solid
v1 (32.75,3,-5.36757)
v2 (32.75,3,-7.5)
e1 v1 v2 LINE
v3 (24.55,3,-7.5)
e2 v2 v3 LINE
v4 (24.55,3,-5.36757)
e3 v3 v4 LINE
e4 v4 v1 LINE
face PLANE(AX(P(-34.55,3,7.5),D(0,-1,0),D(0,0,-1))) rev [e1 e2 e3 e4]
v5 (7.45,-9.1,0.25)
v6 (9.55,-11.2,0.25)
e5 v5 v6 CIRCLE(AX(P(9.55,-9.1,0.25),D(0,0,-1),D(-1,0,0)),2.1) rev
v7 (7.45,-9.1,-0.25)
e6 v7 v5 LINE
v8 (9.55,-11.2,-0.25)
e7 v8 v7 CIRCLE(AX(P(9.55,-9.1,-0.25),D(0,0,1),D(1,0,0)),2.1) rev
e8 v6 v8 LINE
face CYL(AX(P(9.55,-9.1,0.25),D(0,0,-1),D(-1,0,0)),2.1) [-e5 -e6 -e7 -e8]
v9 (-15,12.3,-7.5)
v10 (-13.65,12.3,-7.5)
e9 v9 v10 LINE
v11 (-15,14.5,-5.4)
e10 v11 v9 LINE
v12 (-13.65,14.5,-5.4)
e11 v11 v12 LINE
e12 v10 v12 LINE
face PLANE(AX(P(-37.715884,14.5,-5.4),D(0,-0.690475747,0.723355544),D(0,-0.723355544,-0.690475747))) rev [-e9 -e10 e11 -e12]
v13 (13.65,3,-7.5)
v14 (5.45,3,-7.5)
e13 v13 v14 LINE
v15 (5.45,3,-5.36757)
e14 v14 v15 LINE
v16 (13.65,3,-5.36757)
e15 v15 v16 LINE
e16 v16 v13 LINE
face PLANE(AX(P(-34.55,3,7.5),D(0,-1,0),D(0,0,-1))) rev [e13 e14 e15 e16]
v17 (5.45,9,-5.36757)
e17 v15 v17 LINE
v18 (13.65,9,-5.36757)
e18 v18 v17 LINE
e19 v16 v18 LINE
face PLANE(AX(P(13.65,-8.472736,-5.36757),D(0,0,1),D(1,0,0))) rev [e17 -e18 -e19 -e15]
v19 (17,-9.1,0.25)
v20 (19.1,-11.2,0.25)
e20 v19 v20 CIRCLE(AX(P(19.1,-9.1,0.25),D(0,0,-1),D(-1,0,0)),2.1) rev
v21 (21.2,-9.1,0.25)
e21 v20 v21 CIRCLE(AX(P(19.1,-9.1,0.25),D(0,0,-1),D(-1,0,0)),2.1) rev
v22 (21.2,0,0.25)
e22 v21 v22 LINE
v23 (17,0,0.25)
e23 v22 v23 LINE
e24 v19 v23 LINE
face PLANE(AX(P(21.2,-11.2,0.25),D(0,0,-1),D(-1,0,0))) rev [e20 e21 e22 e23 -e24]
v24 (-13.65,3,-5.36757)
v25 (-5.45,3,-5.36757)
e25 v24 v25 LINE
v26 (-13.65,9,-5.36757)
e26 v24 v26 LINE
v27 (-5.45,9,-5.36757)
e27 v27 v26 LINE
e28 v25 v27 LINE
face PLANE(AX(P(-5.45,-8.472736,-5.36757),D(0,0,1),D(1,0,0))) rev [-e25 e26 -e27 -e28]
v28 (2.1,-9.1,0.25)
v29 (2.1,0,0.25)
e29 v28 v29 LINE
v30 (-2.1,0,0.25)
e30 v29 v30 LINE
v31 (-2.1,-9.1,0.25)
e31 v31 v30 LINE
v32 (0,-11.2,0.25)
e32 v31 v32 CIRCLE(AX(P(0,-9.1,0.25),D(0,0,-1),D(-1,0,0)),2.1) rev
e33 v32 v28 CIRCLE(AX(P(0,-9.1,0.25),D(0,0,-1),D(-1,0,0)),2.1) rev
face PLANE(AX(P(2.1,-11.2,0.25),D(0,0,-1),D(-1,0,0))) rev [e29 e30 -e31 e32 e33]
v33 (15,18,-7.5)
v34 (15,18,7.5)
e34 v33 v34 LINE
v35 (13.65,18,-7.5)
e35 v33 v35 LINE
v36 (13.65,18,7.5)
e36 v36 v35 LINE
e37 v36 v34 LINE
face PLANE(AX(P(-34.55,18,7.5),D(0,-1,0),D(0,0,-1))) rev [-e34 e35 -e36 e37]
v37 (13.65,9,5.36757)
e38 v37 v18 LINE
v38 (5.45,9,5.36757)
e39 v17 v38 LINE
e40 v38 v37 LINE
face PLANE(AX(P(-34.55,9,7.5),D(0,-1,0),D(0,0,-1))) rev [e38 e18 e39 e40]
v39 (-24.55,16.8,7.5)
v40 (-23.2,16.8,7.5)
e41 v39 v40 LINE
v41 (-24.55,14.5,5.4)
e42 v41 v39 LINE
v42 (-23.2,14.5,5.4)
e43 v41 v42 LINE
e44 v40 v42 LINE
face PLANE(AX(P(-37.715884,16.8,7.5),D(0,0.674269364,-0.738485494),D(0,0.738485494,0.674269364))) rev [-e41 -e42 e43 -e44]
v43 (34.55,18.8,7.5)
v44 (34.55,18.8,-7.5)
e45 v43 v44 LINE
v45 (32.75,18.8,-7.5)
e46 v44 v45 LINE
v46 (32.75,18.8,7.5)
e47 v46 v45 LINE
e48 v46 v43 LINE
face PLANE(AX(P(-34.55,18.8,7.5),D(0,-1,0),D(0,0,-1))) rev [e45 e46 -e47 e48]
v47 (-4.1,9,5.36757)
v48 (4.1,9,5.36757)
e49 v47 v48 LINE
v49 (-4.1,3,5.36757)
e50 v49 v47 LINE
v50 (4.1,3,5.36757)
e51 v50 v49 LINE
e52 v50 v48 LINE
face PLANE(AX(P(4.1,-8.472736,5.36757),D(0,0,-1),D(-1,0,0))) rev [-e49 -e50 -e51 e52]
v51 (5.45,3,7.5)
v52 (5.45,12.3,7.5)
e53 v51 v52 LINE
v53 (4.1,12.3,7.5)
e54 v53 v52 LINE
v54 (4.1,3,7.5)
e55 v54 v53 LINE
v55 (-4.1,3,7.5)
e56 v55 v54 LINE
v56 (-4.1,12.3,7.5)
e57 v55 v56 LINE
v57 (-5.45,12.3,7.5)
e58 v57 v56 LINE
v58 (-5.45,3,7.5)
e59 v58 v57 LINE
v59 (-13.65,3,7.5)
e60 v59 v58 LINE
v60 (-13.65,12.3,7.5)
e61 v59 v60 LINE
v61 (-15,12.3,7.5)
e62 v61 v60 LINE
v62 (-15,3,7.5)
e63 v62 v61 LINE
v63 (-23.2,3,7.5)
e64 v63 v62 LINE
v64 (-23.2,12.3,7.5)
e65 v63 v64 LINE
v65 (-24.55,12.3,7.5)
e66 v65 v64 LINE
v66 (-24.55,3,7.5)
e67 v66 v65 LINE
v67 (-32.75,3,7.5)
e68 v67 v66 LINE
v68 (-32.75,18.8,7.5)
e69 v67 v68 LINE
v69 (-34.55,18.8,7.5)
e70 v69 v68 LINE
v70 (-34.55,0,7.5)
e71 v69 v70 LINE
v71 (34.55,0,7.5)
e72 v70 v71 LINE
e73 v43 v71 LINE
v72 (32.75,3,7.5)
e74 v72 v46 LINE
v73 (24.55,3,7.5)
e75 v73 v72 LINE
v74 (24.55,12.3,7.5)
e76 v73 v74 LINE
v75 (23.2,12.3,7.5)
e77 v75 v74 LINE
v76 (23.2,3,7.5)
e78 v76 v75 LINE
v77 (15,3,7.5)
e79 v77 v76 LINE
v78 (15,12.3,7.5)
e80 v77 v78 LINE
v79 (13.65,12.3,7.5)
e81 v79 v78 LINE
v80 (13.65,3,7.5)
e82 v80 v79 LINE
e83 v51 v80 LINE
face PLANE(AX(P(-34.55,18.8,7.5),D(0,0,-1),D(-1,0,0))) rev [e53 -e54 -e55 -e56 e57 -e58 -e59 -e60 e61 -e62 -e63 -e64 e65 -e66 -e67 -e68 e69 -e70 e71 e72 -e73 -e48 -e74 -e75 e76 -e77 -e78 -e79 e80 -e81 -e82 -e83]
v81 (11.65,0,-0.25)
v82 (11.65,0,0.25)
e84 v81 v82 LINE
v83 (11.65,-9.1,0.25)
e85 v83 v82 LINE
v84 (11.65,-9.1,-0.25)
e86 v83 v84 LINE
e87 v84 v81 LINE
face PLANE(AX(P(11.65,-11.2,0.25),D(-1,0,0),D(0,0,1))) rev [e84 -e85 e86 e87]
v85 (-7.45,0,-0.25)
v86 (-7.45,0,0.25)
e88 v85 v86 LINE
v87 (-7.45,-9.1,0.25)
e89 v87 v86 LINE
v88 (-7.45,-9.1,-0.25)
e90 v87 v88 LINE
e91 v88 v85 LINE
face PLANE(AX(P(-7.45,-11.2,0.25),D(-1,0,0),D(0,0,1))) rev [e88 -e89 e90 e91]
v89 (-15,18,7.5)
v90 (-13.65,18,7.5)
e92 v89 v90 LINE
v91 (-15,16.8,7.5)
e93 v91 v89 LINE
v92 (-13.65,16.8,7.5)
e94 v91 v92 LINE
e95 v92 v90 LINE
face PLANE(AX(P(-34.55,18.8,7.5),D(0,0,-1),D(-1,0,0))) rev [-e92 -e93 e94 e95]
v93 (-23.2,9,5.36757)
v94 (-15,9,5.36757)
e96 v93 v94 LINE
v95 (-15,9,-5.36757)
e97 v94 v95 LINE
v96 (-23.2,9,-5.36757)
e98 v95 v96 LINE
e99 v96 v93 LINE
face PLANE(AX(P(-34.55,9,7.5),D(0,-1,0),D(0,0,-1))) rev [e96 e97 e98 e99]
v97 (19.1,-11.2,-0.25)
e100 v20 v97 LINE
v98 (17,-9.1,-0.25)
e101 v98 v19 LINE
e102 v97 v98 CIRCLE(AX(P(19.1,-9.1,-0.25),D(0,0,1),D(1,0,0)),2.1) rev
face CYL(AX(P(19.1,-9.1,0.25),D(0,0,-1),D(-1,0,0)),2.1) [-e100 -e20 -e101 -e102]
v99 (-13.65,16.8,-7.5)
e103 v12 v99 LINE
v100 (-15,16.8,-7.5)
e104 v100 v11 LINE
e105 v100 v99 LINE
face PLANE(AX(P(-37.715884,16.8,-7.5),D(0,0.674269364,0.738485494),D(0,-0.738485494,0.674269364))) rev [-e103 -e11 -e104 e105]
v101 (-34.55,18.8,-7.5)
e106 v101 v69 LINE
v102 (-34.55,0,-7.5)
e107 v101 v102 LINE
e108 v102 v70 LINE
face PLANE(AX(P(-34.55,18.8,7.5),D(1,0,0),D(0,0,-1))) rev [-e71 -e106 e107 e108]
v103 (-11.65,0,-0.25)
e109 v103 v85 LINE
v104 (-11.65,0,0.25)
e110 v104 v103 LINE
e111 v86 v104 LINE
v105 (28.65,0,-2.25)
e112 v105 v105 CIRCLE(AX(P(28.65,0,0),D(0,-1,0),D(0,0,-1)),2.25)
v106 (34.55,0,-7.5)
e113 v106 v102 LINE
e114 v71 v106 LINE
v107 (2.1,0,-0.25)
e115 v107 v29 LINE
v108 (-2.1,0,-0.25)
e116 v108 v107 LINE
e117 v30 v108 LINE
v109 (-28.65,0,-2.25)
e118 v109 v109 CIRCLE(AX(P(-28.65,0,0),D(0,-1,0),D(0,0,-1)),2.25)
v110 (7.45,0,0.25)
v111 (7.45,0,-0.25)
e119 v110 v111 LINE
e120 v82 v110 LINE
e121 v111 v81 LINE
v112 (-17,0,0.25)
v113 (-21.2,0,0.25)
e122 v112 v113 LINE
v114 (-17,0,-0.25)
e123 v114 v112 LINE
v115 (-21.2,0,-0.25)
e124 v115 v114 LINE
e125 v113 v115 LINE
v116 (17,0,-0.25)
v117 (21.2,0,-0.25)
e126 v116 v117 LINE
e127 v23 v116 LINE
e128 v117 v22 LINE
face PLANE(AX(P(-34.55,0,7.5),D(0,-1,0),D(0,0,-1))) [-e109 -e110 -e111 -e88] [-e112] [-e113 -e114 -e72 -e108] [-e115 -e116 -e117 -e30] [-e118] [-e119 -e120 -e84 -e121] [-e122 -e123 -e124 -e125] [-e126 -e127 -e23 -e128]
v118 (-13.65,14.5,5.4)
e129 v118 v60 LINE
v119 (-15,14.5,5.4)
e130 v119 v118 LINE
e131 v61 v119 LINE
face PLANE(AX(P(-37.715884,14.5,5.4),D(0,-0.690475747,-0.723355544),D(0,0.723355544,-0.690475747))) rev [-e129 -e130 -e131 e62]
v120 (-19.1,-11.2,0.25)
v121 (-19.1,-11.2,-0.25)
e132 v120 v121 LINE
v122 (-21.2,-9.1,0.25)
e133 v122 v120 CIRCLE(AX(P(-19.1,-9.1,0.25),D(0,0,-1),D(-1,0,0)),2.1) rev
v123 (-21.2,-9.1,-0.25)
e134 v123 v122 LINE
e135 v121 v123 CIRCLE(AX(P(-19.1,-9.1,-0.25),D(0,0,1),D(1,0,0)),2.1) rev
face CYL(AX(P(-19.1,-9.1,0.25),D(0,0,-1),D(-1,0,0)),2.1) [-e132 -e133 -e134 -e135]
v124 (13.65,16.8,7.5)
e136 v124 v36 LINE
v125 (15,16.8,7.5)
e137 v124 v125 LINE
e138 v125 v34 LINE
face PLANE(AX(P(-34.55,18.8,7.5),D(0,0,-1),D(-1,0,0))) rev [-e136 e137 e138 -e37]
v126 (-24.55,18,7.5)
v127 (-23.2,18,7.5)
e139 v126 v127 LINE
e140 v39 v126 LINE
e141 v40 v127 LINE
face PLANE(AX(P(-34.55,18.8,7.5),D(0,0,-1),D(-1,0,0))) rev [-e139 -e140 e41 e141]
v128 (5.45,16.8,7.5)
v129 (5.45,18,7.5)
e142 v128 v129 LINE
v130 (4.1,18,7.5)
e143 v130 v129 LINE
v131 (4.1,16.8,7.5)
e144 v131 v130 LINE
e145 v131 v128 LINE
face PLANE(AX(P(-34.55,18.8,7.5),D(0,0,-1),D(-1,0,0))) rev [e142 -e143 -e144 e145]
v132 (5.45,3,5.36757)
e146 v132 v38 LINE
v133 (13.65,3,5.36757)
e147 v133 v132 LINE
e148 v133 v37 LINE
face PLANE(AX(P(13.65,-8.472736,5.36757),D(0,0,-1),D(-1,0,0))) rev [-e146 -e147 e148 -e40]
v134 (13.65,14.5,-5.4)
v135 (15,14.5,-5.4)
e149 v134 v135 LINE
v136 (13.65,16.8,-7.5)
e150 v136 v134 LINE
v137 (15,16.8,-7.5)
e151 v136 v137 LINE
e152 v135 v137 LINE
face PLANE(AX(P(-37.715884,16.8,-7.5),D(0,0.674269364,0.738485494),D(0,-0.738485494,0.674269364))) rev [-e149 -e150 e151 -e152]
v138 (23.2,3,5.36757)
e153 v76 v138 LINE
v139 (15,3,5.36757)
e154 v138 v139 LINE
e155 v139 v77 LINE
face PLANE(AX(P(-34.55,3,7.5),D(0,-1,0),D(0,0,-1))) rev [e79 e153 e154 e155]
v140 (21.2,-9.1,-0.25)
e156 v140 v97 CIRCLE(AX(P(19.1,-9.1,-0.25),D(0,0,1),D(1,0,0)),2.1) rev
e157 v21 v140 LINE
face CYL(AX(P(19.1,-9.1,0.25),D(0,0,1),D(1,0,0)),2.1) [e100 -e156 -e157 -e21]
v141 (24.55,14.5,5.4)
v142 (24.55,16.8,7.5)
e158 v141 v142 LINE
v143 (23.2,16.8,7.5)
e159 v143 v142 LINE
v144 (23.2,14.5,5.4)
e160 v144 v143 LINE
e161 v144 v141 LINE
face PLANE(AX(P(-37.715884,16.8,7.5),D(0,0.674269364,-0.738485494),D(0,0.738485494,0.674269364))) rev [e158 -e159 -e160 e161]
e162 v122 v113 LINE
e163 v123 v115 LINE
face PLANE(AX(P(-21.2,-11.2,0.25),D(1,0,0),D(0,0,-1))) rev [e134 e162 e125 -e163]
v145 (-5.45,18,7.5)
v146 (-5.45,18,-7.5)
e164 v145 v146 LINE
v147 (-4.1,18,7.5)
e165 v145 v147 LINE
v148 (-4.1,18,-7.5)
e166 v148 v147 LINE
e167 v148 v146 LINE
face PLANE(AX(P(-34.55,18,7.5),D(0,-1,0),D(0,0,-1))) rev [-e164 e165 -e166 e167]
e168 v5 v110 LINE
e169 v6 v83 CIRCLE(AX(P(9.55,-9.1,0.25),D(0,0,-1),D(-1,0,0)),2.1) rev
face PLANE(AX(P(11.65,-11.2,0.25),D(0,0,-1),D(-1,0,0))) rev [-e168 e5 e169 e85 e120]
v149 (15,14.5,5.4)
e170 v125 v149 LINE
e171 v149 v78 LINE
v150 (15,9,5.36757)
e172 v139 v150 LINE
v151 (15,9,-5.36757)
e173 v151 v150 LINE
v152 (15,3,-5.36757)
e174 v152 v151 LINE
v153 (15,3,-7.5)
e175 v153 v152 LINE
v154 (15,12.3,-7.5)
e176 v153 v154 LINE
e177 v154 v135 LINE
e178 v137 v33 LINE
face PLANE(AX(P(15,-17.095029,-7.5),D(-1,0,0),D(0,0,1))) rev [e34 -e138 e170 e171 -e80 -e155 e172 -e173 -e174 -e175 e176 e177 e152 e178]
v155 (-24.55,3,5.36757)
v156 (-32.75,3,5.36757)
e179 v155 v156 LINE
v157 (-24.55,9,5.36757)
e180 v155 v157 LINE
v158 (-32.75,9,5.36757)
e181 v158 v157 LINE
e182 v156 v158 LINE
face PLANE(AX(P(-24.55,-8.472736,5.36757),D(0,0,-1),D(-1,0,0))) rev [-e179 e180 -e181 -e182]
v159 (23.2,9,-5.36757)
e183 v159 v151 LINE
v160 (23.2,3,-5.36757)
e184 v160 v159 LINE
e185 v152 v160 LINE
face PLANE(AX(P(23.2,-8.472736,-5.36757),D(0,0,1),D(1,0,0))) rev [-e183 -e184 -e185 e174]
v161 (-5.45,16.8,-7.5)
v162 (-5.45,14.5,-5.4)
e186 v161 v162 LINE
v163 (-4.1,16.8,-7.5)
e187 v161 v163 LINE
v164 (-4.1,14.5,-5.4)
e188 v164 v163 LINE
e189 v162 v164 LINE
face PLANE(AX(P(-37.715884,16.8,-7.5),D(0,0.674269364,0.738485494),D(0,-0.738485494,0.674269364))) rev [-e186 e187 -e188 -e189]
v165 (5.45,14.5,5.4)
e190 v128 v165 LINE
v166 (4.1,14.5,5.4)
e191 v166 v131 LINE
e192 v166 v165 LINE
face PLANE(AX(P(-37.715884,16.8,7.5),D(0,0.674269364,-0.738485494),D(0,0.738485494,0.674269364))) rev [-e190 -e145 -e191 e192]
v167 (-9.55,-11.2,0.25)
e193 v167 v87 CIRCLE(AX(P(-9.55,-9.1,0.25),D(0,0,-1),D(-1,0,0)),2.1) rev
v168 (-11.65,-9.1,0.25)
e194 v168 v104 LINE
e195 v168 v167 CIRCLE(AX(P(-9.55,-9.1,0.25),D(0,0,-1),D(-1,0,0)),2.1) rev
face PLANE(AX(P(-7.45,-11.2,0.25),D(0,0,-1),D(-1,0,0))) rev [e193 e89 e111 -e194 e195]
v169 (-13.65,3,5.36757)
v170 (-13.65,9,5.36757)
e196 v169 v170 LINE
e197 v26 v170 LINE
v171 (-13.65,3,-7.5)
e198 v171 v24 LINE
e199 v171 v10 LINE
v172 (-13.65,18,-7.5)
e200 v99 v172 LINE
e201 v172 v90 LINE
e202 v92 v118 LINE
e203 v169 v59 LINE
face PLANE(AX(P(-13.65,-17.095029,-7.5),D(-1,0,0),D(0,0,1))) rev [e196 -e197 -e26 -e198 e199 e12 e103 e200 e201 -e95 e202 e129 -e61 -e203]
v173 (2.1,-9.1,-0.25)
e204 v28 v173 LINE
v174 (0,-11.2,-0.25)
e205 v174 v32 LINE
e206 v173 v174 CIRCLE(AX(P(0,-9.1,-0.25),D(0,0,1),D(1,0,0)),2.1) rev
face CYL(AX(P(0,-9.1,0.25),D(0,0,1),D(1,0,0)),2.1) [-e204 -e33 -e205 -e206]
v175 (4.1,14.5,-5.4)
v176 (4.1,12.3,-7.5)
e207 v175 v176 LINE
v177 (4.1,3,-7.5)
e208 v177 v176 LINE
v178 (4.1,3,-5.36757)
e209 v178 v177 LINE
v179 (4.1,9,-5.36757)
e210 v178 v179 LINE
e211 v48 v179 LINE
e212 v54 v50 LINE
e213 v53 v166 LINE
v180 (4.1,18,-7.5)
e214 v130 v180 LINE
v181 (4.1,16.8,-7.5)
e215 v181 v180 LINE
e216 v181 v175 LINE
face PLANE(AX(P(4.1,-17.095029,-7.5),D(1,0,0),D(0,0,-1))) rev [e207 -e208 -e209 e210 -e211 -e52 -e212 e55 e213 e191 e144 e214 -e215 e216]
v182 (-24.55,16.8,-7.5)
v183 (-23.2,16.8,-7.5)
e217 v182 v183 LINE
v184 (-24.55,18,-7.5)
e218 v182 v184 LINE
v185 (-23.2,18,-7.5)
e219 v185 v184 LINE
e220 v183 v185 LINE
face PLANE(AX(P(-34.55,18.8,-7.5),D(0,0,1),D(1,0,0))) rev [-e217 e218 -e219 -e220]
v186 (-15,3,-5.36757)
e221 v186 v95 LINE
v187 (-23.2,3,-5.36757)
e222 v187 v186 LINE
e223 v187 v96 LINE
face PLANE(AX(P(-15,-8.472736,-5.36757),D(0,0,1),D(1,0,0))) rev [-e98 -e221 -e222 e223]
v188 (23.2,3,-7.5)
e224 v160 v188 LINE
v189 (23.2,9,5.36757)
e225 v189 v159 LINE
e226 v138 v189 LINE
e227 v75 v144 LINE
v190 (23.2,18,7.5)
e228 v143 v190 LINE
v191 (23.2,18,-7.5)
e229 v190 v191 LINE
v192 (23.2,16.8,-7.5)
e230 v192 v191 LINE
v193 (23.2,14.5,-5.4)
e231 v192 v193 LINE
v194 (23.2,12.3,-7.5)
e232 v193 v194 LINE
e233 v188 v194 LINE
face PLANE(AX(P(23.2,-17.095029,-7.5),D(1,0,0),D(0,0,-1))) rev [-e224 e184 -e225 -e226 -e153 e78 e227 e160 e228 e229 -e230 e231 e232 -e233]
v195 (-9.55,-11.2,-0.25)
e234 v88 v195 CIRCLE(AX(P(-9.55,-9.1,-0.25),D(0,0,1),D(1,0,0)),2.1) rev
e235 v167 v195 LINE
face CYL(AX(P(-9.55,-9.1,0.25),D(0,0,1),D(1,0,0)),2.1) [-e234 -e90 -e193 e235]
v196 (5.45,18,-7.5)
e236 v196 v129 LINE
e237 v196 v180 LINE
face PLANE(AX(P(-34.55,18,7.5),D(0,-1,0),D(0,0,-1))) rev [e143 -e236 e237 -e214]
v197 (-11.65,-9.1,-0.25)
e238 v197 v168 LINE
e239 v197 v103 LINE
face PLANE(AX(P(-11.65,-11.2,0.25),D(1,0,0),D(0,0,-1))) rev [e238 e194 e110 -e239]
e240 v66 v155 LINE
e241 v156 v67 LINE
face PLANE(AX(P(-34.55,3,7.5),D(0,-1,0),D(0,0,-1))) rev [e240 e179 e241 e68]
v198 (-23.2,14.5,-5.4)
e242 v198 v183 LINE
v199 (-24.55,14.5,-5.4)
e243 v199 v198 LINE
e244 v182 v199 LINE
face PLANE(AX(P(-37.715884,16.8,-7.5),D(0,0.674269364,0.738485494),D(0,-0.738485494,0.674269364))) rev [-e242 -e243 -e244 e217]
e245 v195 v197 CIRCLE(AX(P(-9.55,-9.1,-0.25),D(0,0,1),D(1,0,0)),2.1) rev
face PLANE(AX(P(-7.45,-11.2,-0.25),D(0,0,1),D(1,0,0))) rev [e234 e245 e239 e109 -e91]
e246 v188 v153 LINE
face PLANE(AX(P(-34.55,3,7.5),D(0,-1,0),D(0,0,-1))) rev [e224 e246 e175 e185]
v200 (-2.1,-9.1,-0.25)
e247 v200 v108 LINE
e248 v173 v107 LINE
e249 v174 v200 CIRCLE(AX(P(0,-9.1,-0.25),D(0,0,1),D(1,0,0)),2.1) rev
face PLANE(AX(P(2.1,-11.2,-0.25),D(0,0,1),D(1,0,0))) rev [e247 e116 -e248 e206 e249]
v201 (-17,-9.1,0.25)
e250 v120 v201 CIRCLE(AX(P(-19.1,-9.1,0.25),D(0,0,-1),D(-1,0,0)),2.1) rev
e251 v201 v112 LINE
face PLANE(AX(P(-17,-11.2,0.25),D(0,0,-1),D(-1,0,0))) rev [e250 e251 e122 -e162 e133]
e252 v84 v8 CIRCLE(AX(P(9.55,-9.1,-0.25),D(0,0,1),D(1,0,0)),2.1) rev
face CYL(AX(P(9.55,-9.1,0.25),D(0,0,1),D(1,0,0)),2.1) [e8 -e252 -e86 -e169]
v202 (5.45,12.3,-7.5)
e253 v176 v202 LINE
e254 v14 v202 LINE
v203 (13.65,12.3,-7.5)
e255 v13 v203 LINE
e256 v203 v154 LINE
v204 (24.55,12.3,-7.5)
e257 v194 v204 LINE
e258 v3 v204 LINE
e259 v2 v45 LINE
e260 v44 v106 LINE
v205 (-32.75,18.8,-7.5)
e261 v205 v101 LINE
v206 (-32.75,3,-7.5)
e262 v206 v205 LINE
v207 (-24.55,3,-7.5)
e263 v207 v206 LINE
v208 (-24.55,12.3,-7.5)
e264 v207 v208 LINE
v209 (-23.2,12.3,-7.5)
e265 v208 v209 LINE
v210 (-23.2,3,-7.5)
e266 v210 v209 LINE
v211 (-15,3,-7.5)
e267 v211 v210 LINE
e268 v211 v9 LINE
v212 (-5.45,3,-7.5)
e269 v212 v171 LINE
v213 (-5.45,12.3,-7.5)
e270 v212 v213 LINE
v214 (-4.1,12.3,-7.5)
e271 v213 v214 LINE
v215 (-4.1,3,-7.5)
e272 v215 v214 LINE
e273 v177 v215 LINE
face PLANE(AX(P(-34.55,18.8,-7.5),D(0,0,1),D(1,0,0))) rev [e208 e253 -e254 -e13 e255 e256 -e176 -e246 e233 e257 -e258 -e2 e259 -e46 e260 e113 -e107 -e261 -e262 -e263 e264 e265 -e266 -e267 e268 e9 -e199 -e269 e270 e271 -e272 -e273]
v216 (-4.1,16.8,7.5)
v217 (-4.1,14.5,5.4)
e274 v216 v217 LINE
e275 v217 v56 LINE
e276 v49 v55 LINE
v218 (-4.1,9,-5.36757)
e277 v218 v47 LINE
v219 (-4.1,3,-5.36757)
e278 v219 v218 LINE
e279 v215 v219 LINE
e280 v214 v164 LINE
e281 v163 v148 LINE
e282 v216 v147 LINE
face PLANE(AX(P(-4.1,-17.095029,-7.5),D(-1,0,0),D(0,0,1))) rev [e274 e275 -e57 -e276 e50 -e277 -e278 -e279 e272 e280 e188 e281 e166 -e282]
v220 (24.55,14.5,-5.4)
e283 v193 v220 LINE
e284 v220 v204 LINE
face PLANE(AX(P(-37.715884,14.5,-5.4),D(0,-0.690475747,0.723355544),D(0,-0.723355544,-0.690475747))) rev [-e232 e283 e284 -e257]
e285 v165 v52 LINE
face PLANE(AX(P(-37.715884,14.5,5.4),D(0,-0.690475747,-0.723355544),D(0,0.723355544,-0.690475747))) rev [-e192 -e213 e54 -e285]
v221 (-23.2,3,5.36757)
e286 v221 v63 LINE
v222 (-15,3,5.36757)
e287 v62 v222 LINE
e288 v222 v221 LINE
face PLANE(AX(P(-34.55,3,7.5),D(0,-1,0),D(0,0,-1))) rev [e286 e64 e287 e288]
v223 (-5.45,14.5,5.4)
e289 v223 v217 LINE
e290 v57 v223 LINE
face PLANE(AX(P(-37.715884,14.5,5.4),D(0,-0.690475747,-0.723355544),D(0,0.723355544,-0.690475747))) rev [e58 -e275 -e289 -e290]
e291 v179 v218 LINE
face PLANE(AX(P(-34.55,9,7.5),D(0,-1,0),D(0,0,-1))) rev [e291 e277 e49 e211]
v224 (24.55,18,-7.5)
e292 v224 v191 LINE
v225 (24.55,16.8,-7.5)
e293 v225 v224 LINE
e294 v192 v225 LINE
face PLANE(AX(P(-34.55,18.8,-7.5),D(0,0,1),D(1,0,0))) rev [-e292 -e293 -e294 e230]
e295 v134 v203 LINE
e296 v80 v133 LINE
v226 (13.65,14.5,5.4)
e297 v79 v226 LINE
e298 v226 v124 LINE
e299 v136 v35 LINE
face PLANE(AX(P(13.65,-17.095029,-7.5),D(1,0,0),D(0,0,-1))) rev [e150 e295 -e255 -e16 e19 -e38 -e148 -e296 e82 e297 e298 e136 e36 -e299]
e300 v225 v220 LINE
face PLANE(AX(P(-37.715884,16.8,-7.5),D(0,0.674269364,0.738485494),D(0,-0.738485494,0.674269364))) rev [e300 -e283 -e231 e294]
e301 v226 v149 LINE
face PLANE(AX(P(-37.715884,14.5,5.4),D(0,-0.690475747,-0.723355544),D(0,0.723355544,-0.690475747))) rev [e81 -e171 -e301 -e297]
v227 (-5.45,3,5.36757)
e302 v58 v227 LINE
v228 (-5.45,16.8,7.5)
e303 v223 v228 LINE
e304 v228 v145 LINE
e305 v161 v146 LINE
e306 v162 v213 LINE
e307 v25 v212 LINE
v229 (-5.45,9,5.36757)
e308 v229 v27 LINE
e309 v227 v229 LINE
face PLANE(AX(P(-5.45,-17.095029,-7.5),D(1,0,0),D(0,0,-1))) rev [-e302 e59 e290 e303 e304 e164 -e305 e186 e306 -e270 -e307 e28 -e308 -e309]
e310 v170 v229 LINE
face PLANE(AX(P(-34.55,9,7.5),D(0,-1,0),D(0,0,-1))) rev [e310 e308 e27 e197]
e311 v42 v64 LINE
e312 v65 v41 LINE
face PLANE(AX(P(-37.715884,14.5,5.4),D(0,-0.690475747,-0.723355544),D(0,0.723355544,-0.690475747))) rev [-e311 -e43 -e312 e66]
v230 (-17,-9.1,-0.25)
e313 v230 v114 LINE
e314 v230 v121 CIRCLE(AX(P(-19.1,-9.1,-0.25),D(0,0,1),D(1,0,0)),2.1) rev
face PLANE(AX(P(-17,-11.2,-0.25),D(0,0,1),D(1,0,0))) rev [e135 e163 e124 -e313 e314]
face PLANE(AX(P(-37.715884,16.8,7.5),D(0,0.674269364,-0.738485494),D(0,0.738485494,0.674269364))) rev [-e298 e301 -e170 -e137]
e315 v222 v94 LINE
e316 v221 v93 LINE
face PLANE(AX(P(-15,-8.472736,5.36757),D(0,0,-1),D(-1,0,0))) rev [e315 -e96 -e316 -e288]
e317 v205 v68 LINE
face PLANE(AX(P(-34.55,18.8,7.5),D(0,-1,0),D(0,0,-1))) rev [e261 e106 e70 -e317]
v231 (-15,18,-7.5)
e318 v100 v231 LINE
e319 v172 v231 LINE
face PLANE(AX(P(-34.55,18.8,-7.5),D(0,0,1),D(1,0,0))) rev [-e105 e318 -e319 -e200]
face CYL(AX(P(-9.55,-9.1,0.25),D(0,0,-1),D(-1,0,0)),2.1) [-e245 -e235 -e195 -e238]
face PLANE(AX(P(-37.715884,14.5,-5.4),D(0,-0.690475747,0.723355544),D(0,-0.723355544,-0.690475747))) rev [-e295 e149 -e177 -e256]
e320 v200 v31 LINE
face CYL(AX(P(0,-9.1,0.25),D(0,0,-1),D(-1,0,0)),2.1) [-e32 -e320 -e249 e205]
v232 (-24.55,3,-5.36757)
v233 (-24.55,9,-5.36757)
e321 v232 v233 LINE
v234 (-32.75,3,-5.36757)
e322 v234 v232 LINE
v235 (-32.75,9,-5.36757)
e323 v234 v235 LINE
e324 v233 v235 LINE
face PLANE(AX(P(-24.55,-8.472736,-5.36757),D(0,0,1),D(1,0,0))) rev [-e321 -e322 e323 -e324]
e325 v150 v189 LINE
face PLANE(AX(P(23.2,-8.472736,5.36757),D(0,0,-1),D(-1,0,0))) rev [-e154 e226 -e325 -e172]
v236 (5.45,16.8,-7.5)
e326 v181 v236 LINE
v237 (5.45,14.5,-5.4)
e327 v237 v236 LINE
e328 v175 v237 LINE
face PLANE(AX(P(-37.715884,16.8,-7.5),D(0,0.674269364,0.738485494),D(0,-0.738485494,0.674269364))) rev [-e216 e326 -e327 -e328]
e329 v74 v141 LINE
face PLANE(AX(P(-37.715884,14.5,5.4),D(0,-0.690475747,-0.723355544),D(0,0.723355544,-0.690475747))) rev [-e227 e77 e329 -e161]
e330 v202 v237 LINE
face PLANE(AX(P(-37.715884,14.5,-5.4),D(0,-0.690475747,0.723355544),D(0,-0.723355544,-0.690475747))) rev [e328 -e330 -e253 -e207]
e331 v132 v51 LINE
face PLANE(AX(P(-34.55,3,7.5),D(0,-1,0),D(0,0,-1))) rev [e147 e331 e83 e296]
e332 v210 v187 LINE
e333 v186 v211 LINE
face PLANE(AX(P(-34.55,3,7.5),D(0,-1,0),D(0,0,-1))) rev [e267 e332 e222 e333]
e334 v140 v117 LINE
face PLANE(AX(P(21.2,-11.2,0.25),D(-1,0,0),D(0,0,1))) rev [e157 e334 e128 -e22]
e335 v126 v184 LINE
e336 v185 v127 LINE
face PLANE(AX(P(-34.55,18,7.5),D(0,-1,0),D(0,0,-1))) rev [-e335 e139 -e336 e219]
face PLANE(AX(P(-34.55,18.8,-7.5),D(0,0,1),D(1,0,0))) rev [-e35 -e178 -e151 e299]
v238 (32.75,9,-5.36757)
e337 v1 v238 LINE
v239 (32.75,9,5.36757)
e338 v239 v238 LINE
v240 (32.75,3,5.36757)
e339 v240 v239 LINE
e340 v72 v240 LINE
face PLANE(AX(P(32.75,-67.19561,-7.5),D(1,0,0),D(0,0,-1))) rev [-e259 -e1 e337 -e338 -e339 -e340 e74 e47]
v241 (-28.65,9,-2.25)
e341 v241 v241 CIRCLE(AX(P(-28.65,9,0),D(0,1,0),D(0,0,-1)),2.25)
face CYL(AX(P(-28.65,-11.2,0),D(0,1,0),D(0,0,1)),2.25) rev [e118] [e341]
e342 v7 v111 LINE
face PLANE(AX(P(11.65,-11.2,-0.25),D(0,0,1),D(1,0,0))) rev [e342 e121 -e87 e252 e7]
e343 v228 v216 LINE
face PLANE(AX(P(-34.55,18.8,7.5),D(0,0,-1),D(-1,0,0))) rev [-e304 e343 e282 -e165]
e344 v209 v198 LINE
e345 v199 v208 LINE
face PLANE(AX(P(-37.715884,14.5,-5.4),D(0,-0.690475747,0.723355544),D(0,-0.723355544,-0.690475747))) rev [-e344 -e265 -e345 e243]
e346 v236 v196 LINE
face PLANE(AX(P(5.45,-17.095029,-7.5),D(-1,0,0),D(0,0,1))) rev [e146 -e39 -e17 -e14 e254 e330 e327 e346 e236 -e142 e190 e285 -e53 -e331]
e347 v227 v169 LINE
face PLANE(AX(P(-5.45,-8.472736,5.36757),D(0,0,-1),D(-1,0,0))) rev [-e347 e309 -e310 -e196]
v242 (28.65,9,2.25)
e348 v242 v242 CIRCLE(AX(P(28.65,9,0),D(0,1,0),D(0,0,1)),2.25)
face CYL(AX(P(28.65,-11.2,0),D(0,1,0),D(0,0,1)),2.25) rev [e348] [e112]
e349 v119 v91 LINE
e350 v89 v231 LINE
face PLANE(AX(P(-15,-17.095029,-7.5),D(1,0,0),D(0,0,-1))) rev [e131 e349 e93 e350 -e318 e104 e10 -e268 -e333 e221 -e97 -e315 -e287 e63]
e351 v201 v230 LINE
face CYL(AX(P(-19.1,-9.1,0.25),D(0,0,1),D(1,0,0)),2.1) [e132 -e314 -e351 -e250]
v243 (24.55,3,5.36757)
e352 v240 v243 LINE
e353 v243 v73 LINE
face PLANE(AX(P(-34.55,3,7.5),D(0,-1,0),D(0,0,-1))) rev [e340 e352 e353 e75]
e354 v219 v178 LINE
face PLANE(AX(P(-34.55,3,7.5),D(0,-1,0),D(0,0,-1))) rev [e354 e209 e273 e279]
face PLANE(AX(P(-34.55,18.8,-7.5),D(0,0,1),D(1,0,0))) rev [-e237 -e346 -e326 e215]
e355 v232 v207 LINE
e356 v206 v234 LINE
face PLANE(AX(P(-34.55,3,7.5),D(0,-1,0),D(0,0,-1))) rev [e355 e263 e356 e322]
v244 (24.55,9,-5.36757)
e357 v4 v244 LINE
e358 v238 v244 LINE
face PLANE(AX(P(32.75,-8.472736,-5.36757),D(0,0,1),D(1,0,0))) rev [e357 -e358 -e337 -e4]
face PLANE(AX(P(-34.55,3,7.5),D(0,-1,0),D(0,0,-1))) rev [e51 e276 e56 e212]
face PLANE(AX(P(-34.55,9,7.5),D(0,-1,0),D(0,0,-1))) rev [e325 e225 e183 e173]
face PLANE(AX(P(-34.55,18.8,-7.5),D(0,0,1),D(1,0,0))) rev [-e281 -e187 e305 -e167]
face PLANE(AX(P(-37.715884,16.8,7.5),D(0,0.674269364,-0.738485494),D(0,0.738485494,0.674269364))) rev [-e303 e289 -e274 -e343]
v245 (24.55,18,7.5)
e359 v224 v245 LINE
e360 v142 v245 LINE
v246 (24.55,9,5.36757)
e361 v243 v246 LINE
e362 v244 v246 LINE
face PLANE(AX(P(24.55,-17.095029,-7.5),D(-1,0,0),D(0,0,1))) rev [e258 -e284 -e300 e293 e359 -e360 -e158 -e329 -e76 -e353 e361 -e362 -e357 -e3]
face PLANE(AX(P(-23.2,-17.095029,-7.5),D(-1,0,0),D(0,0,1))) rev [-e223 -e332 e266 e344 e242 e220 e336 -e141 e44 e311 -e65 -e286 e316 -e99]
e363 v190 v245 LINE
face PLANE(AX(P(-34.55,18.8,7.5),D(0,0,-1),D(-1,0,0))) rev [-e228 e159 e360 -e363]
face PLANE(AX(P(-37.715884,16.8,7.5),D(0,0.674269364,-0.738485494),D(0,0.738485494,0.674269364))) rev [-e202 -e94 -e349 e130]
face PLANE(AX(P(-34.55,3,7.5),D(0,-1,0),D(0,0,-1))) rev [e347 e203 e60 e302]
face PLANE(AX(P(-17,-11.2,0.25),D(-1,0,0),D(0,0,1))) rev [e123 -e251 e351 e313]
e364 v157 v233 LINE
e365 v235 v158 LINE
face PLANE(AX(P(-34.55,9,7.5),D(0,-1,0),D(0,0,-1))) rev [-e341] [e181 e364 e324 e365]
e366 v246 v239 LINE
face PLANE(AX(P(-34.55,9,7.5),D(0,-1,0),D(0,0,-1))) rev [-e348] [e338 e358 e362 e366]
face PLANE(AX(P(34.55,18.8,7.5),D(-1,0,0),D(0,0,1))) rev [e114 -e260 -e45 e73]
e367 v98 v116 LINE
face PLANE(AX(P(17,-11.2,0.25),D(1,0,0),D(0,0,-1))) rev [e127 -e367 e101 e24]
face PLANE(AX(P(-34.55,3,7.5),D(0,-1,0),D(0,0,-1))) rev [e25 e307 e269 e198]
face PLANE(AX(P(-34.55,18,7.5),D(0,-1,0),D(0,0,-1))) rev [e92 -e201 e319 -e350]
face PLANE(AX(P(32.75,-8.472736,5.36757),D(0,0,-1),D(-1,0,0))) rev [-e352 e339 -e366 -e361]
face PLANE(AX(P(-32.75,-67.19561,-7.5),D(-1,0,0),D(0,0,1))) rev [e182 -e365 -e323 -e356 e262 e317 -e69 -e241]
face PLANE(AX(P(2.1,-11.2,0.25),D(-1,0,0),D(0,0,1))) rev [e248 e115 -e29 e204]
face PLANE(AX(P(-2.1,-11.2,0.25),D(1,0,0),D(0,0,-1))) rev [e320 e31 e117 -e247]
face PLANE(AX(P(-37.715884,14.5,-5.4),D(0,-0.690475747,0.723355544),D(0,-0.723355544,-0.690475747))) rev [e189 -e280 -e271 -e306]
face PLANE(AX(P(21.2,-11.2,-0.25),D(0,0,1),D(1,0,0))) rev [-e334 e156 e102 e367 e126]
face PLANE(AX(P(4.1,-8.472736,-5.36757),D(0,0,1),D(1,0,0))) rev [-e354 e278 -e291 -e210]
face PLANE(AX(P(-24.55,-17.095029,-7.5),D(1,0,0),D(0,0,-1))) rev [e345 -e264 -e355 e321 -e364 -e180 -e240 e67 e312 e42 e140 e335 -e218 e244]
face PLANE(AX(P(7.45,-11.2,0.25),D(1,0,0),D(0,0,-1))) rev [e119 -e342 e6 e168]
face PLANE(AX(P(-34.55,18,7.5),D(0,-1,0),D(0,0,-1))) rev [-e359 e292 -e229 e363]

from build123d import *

# Parameters (mm, degrees)
SKETCH_1_W          = 69.1
SKETCH_1_H          = 15
EXTRUDE_1_DEPTH     = 18.8
SKETCH_2_W          = 65.5
SKETCH_2_H          = 15
CUT_EXTRUDE_1_DEPTH = 0.8
SKETCH_4_W          = 8.2
SKETCH_4_H          = 15
CUT_EXTRUDE_2_DEPTH = 9
SKETCH_5_W          = 8.2
SKETCH_5_H          = 2.132429546
CUT_EXTRUDE_3_DEPTH = 15
SKETCH_6_W          = 4.2
SKETCH_6_H          = 0.5
EXTRUDE_2_DEPTH     = 11.2
SKETCH_7_R          = 2.25
CUT_EXTRUDE_4_DEPTH = 41.718454047
CUT_EXTRUDE_START   = -49.1
CUT_EXTRUDE_5_DEPTH = 49.1
FILLET_1_R          = 2.1


with BuildPart() as part:
    # 草图1 → 拉伸1 (new body)
    with BuildSketch(Plane(origin=(0, 0, 0), x_dir=(1, 0, 0), z_dir=(0, 1, 0))):
        Rectangle(SKETCH_1_W, SKETCH_1_H)
    extrude(amount=EXTRUDE_1_DEPTH)

    # 草图2 → 切除-拉伸1 (cut)
    with BuildSketch(Plane(origin=(0, 18.8, 0), x_dir=(-1, 0, 0), z_dir=(0, 1, 0))):
        Rectangle(SKETCH_2_W, SKETCH_2_H)
    extrude(amount=-CUT_EXTRUDE_1_DEPTH, mode=Mode.SUBTRACT)

    # 草图4 → 切除-拉伸2 (cut)
    with BuildSketch(Plane(origin=(0, 18, 0), x_dir=(-1, 0, 0), z_dir=(0, 1, 0))):
        with Locations((-28.65, 0)):
            Rectangle(SKETCH_4_W, SKETCH_4_H)
        with Locations((-19.1, 0)):
            Rectangle(SKETCH_4_W, SKETCH_4_H)
        with Locations((-9.55, 0)):
            Rectangle(SKETCH_4_W, SKETCH_4_H)
        Rectangle(SKETCH_4_W, SKETCH_4_H)
        with Locations((9.55, 0)):
            Rectangle(SKETCH_4_W, SKETCH_4_H)
        with Locations((19.1, 0)):
            Rectangle(SKETCH_4_W, SKETCH_4_H)
        with Locations((28.65, 0)):
            Rectangle(SKETCH_4_W, SKETCH_4_H)
    extrude(amount=-CUT_EXTRUDE_2_DEPTH, mode=Mode.SUBTRACT)

    # 草图5 → 切除-拉伸3 (cut)
    with BuildSketch(Plane(origin=(0, 18, 0), x_dir=(-1, 0, 0), z_dir=(0, 1, 0))):
        with Locations((-28.65, -6.433785227)):
            Rectangle(SKETCH_5_W, SKETCH_5_H)
        with Locations((-28.65, 6.433785227)):
            Rectangle(SKETCH_5_W, SKETCH_5_H)
        with Locations((-19.1, -6.433785227)):
            Rectangle(SKETCH_5_W, SKETCH_5_H)
        with Locations((-19.1, 6.433785227)):
            Rectangle(SKETCH_5_W, SKETCH_5_H)
        with Locations((-9.55, -6.433785227)):
            Rectangle(SKETCH_5_W, SKETCH_5_H)
        with Locations((-9.55, 6.433785227)):
            Rectangle(SKETCH_5_W, SKETCH_5_H)
        with Locations((0, -6.433785227)):
            Rectangle(SKETCH_5_W, SKETCH_5_H)
        with Locations((0, 6.433785227)):
            Rectangle(SKETCH_5_W, SKETCH_5_H)
        with Locations((9.55, -6.433785227)):
            Rectangle(SKETCH_5_W, SKETCH_5_H)
        with Locations((9.55, 6.433785227)):
            Rectangle(SKETCH_5_W, SKETCH_5_H)
        with Locations((19.1, -6.433785227)):
            Rectangle(SKETCH_5_W, SKETCH_5_H)
        with Locations((19.1, 6.433785227)):
            Rectangle(SKETCH_5_W, SKETCH_5_H)
        with Locations((28.65, -6.433785227)):
            Rectangle(SKETCH_5_W, SKETCH_5_H)
        with Locations((28.65, 6.433785227)):
            Rectangle(SKETCH_5_W, SKETCH_5_H)
    extrude(amount=-CUT_EXTRUDE_3_DEPTH, mode=Mode.SUBTRACT)

    # 草图6 → 拉伸2 (add)
    with BuildSketch(Plane.XZ):
        Rectangle(SKETCH_6_W, SKETCH_6_H)
        with Locations((9.55, 0)):
            Rectangle(SKETCH_6_W, SKETCH_6_H)
        with Locations((19.1, 0)):
            Rectangle(SKETCH_6_W, SKETCH_6_H)
        with Locations((-9.55, 0)):
            Rectangle(SKETCH_6_W, SKETCH_6_H)
        with Locations((-19.1, 0)):
            Rectangle(SKETCH_6_W, SKETCH_6_H)
    extrude(amount=EXTRUDE_2_DEPTH)

    # 草图7 → 切除-拉伸4 (cut, through all)
    with BuildSketch(Plane(origin=(0, 9, 0), x_dir=(-1, 0, 0), z_dir=(0, 1, 0))):
        with Locations(Location((-28.65, 0, 0), (0, 0, 90))):
            Circle(SKETCH_7_R)
        with Locations(Location((28.65, 0, 0), (0, 0, 270))):
            Circle(SKETCH_7_R)
    extrude(amount=-CUT_EXTRUDE_4_DEPTH, mode=Mode.SUBTRACT)

    # 草图8 → 切除-拉伸5 (cut)
    with BuildSketch(Plane(origin=(24.55, 0, 0), x_dir=(0, 0, -1), z_dir=(1, 0, 0)).offset(CUT_EXTRUDE_START)):
        Polygon((7.5, 16.8), (5.4, 14.5), (7.5, 12.3), align=None)
        Polygon((-7.5, 16.8), (-7.5, 12.3), (-5.4, 14.5), align=None)
    extrude(amount=CUT_EXTRUDE_5_DEPTH, mode=Mode.SUBTRACT)

    # 圆角1
    fillet_1_edges = [part.edges().sort_by_distance(p)[0] for p in [
        (-21.2, -11.2, 0),
        (21.2, -11.2, 0),
        (17, -11.2, 0),
        (11.65, -11.2, 0),
        (7.45, -11.2, 0),
        (-2.1, -11.2, 0),
        (2.1, -11.2, 0),
        (-7.45, -11.2, 0),
        (-11.65, -11.2, 0),
        (-17, -11.2, 0),
    ]]
    fillet(fillet_1_edges, radius=FILLET_1_R - 0.0001)  # a hair under: the kernel refuses the full size


solid = part.part
